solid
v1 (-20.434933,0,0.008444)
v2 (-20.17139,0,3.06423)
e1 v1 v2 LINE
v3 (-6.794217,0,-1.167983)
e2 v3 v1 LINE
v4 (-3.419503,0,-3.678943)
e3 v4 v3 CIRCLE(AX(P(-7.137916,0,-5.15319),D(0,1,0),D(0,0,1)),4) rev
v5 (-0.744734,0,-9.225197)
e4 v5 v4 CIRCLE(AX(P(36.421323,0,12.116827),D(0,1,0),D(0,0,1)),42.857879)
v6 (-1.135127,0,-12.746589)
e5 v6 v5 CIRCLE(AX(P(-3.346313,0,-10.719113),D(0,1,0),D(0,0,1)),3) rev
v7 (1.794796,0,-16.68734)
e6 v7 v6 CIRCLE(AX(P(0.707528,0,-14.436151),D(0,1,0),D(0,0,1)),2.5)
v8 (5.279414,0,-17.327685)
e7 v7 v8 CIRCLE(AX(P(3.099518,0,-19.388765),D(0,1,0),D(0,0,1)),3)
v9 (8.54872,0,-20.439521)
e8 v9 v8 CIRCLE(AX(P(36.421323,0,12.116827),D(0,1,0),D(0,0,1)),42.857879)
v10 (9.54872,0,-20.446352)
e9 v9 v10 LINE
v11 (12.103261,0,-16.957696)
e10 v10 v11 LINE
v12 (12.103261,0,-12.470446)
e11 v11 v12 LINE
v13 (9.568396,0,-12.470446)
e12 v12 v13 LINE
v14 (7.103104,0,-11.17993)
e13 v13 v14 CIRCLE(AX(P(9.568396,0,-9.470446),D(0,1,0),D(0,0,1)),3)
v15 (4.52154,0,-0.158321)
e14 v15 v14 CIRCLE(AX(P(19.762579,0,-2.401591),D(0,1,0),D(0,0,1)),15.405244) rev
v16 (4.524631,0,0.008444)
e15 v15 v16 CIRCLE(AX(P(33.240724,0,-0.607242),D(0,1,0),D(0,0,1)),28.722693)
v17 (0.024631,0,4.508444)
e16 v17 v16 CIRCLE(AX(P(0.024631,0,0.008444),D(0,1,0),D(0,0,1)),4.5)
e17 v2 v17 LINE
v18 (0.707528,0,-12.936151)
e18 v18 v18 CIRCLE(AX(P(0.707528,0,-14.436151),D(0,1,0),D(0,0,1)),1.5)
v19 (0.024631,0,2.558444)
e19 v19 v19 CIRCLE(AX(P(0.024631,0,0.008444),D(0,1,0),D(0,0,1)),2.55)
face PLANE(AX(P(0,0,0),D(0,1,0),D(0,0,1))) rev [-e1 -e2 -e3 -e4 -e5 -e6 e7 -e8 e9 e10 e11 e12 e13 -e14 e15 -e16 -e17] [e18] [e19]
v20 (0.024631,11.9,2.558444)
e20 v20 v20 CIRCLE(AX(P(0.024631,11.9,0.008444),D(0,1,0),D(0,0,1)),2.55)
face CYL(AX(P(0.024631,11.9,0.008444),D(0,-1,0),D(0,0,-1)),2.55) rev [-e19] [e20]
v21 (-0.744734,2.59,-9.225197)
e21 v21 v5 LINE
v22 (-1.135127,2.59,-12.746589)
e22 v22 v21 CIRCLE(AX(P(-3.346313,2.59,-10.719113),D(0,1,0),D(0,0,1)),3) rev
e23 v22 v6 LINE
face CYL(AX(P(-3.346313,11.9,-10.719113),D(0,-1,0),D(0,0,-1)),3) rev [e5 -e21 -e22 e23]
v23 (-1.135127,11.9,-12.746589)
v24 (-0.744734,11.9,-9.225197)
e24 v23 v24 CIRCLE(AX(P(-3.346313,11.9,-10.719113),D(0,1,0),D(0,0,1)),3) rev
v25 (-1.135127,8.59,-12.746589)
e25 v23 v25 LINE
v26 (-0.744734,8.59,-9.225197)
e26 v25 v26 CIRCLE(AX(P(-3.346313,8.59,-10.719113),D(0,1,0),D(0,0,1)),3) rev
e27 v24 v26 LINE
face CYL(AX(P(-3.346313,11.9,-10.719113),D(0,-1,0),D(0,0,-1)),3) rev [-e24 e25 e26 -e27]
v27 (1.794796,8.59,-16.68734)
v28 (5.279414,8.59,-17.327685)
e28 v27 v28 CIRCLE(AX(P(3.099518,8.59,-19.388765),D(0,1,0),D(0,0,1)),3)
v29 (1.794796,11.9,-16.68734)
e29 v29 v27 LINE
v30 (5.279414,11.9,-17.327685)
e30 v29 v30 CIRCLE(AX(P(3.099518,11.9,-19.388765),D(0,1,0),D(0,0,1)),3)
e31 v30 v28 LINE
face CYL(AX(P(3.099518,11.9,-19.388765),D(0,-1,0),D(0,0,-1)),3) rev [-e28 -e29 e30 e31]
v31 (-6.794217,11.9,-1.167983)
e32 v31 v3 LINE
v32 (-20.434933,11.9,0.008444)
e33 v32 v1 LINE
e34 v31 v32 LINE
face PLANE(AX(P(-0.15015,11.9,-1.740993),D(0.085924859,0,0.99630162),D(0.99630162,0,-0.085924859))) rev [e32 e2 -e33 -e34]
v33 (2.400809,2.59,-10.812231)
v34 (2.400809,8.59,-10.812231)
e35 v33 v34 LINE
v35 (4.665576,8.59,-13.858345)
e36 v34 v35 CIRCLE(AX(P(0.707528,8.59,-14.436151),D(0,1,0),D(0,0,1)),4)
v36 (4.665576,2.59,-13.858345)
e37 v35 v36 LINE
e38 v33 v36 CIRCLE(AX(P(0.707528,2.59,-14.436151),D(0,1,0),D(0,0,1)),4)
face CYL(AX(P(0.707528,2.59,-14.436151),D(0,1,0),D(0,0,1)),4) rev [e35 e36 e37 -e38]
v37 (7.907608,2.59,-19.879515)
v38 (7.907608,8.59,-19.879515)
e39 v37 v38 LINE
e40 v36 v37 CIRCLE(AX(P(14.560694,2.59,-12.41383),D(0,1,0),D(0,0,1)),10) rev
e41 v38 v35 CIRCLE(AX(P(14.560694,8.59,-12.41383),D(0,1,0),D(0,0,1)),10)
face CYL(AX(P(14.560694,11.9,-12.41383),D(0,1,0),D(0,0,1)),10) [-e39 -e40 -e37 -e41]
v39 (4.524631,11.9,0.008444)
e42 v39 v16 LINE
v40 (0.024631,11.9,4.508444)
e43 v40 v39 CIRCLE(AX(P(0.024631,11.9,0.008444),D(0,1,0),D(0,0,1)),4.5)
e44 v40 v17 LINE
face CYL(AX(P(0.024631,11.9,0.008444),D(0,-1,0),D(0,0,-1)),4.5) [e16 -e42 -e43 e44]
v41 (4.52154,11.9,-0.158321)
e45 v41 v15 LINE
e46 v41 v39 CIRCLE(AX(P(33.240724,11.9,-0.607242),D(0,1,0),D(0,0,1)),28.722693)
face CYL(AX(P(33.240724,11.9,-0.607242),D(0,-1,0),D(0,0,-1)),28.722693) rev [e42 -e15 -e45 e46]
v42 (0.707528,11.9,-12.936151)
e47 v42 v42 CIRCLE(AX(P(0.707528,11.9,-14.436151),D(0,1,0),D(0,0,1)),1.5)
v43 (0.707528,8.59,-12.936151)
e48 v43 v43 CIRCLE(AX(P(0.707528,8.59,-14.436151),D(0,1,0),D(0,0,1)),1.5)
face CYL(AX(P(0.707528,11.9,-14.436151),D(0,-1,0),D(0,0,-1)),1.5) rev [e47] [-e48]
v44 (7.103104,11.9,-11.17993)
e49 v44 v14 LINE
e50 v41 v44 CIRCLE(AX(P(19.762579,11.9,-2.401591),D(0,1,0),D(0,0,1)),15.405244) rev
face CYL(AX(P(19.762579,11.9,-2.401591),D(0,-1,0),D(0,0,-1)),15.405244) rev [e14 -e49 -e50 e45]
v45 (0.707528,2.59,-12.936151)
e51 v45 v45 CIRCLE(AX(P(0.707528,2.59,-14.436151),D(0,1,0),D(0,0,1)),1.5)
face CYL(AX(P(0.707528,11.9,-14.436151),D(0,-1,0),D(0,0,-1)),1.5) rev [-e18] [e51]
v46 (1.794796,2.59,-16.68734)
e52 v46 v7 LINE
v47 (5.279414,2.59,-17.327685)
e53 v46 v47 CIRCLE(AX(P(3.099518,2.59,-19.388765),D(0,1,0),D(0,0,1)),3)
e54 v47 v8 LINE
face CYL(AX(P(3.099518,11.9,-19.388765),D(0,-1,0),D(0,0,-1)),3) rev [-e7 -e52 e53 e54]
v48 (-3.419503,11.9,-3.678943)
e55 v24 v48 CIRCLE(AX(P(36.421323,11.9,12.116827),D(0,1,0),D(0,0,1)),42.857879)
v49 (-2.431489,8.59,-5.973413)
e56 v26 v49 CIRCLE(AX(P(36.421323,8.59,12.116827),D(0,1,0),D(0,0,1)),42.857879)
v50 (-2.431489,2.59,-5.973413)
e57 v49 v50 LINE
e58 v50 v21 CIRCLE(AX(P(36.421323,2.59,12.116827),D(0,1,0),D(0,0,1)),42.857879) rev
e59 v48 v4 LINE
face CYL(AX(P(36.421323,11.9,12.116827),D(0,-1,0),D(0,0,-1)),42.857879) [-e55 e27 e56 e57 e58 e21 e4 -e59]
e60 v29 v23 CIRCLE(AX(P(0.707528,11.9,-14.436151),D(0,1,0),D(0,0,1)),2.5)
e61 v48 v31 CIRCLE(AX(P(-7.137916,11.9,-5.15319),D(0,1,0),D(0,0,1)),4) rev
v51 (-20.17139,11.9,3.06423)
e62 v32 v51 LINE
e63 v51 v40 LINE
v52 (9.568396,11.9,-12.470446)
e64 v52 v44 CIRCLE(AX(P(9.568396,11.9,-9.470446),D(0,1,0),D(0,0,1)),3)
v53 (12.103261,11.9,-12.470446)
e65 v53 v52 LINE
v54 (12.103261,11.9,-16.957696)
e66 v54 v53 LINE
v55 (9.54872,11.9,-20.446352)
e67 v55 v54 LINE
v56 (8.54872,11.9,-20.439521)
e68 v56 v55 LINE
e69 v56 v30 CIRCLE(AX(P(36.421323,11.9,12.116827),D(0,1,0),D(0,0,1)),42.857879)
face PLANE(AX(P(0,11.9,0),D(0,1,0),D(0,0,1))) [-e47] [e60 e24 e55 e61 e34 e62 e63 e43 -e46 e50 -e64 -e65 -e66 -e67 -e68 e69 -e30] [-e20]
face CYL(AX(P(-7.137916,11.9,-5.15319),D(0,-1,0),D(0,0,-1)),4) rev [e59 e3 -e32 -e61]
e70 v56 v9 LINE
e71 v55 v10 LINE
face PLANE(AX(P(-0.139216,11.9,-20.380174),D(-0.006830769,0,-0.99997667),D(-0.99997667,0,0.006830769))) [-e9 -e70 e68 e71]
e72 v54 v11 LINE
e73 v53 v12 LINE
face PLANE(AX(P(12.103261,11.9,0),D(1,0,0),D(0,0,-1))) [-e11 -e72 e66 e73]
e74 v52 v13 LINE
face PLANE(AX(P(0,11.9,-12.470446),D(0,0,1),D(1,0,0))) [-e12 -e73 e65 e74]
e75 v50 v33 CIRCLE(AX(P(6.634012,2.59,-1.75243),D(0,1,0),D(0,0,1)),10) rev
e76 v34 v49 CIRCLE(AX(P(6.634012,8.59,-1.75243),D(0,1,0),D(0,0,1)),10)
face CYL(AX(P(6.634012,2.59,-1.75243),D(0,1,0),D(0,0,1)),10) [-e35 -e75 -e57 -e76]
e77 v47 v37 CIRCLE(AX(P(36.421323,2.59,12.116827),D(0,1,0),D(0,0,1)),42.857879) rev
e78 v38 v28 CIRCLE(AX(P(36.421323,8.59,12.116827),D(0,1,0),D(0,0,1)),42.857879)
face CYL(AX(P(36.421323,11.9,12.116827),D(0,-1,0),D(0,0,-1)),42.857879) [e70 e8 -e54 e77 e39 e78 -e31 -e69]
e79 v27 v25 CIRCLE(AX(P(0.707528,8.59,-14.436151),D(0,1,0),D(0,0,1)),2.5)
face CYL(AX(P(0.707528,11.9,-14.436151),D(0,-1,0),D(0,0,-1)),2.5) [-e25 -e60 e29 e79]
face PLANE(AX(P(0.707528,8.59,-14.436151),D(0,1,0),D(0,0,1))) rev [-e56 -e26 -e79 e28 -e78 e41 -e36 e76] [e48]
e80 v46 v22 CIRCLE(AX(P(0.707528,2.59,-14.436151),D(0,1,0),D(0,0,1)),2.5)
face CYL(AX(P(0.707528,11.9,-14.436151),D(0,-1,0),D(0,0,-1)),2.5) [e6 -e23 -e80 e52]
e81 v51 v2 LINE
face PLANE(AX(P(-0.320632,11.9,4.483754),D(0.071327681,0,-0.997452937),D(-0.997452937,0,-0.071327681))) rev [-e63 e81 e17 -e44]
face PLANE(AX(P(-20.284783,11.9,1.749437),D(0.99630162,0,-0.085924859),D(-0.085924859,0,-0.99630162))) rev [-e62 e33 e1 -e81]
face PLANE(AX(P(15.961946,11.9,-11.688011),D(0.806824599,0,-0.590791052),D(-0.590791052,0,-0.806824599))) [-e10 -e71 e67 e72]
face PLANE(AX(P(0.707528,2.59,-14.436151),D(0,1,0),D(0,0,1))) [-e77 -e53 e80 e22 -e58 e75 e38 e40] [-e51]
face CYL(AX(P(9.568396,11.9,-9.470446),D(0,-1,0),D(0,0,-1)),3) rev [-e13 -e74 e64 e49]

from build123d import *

# Parameters (mm, degrees)
SKETCH1_R           = 2.55
SKETCH1_R_2         = 1.5
BOSS_EXTRUDE1_DEPTH = 11.9
SKETCH2_R           = 4
CUT_EXTRUDE1_DEPTH  = 3
FILLET1_R           = 10


with BuildPart() as part:
    # Sketch1 → Boss-Extrude1 (new body)
    with BuildSketch(Plane(origin=(0, 0, 0), x_dir=(1, 0, 0), z_dir=(0, 1, 0))):
        with BuildLine():
            Line((9.548719517, 20.446351577), (8.548719517, 20.439520648))
            ThreePointArc((8.548719517, 20.439520648), (6.873073378, 18.92667054), (5.279413844, 17.32768501))
            ThreePointArc((5.279413844, 17.32768501), (3.641729047, 16.438171118), (1.79479604, 16.687339585))
            ThreePointArc((1.79479604, 16.687339585), (-1.298720161, 15.927784086), (-1.135127046, 12.74658866))
            ThreePointArc((-1.135127046, 12.74658866), (-0.36458096, 11.049678177), (-0.744733852, 9.225197364))
            ThreePointArc((-0.744733852, 9.225197364), (-2.181853542, 6.500169129), (-3.4195031, 3.678943251))
            ThreePointArc((-3.4195031, 3.678943251), (-4.750151746, 1.944049699), (-6.794216917, 1.167983317))
            Line((-6.794216917, 1.167983317), (-20.434932532, -0.008444123))
            Line((-20.434932532, -0.008444123), (-20.171389856, -3.064230295))
            Line((-20.171389856, -3.064230295), (-0.61568325, -4.46265538))
            Line((-0.61568325, -4.46265538), (0.024630797, -4.508444123))
            ThreePointArc((0.024630797, -4.508444123), (3.206611312, -3.190424639), (4.524630797, -0.008444123))
            ThreePointArc((4.524630797, -0.008444123), (4.522964187, 0.074936031), (4.52153968, 0.158320674))
            ThreePointArc((4.52153968, 0.158320674), (4.763290961, 5.914837028), (7.103103866, 11.179929599))
            ThreePointArc((7.103103866, 11.179929599), (8.177074896, 12.128306877), (9.568395932, 12.47044575))
            Line((9.568395932, 12.47044575), (12.103260685, 12.47044575))
            Line((12.103260685, 12.47044575), (12.103260685, 16.957695738))
            Line((12.103260685, 16.957695738), (9.548719517, 20.446351577))
        make_face()
        with Locations(Location((0.024630797, -0.008444123, 0), (0, 0, 270))):
            Circle(SKETCH1_R, mode=Mode.SUBTRACT)
        with Locations(Location((0.707528049, 14.436151384, 0), (0, 0, 270))):
            Circle(SKETCH1_R_2, mode=Mode.SUBTRACT)
    extrude(amount=BOSS_EXTRUDE1_DEPTH)

    # Sketch2 → Cut-Extrude1 (cut, symmetric)
    with BuildSketch(Plane(origin=(0, 5.59, 0), x_dir=(1, 0, 0), z_dir=(0, 1, 0))):
        with Locations((0.707528049, 14.436151384)):
            Circle(SKETCH2_R)
    extrude(amount=CUT_EXTRUDE1_DEPTH, both=True, mode=Mode.SUBTRACT)

    # Fillet1
    # the kernel refuses this fillet: 10 mm, written as the material it takes off along each edge
    with BuildSketch(Plane(origin=(4.097372756, 8.59, -16.55958089), x_dir=(0.7539501243329342, 0, -0.6569316631266551), z_dir=(0, -1, 0))) as fillet1_piece_1:
        with BuildLine():
            CenterArc((5.165347529, 9.999376692), FILLET1_R, 229.371801611, 39.988476575)
            Line((-1.346130645, 2.409867354), (-1.997278462, 1.650916421))
            ThreePointArc((-1.997278462, 1.650916421), (-1.331632365, 0.837063937), (-0.987680479, -0.156484095))
            Line((-0.987680479, -0.156484095), (0.368749302, -0.929528887))
            ThreePointArc((0.368749302, -0.929528887), (1.299277263, -0.79792354), (5.042532309, -0.999937669))
            Line((5.042532309, -0.999937669), (5.053697329, 0))
        make_face()
    extrude(amount=6, mode=Mode.SUBTRACT)
    with BuildSketch(Plane(origin=(-0.34961624, 8.59, -10.578374051), x_dir=(-0.41195039334505656, 0, 0.9112062738056916), z_dir=(0, -1, 0))) as fillet1_piece_2:
        with BuildLine():
            CenterArc((5.165347529, -9.999376692), FILLET1_R, 90.639721814, 39.988476575)
            Line((-1.346130645, -2.409867354), (-1.997278462, -1.650916421))
            ThreePointArc((-1.997278462, -1.650916421), (-1.331632365, -0.837063937), (-0.987680479, 0.156484095))
            Line((-0.987680479, 0.156484095), (0.368749302, 0.929528887))
            ThreePointArc((0.368749302, 0.929528887), (1.299277263, 0.79792354), (5.042532309, 0.999937669))
            Line((5.042532309, 0.999937669), (5.053697329, 0))
        make_face()
    extrude(amount=6, mode=Mode.SUBTRACT)


solid = part.part
